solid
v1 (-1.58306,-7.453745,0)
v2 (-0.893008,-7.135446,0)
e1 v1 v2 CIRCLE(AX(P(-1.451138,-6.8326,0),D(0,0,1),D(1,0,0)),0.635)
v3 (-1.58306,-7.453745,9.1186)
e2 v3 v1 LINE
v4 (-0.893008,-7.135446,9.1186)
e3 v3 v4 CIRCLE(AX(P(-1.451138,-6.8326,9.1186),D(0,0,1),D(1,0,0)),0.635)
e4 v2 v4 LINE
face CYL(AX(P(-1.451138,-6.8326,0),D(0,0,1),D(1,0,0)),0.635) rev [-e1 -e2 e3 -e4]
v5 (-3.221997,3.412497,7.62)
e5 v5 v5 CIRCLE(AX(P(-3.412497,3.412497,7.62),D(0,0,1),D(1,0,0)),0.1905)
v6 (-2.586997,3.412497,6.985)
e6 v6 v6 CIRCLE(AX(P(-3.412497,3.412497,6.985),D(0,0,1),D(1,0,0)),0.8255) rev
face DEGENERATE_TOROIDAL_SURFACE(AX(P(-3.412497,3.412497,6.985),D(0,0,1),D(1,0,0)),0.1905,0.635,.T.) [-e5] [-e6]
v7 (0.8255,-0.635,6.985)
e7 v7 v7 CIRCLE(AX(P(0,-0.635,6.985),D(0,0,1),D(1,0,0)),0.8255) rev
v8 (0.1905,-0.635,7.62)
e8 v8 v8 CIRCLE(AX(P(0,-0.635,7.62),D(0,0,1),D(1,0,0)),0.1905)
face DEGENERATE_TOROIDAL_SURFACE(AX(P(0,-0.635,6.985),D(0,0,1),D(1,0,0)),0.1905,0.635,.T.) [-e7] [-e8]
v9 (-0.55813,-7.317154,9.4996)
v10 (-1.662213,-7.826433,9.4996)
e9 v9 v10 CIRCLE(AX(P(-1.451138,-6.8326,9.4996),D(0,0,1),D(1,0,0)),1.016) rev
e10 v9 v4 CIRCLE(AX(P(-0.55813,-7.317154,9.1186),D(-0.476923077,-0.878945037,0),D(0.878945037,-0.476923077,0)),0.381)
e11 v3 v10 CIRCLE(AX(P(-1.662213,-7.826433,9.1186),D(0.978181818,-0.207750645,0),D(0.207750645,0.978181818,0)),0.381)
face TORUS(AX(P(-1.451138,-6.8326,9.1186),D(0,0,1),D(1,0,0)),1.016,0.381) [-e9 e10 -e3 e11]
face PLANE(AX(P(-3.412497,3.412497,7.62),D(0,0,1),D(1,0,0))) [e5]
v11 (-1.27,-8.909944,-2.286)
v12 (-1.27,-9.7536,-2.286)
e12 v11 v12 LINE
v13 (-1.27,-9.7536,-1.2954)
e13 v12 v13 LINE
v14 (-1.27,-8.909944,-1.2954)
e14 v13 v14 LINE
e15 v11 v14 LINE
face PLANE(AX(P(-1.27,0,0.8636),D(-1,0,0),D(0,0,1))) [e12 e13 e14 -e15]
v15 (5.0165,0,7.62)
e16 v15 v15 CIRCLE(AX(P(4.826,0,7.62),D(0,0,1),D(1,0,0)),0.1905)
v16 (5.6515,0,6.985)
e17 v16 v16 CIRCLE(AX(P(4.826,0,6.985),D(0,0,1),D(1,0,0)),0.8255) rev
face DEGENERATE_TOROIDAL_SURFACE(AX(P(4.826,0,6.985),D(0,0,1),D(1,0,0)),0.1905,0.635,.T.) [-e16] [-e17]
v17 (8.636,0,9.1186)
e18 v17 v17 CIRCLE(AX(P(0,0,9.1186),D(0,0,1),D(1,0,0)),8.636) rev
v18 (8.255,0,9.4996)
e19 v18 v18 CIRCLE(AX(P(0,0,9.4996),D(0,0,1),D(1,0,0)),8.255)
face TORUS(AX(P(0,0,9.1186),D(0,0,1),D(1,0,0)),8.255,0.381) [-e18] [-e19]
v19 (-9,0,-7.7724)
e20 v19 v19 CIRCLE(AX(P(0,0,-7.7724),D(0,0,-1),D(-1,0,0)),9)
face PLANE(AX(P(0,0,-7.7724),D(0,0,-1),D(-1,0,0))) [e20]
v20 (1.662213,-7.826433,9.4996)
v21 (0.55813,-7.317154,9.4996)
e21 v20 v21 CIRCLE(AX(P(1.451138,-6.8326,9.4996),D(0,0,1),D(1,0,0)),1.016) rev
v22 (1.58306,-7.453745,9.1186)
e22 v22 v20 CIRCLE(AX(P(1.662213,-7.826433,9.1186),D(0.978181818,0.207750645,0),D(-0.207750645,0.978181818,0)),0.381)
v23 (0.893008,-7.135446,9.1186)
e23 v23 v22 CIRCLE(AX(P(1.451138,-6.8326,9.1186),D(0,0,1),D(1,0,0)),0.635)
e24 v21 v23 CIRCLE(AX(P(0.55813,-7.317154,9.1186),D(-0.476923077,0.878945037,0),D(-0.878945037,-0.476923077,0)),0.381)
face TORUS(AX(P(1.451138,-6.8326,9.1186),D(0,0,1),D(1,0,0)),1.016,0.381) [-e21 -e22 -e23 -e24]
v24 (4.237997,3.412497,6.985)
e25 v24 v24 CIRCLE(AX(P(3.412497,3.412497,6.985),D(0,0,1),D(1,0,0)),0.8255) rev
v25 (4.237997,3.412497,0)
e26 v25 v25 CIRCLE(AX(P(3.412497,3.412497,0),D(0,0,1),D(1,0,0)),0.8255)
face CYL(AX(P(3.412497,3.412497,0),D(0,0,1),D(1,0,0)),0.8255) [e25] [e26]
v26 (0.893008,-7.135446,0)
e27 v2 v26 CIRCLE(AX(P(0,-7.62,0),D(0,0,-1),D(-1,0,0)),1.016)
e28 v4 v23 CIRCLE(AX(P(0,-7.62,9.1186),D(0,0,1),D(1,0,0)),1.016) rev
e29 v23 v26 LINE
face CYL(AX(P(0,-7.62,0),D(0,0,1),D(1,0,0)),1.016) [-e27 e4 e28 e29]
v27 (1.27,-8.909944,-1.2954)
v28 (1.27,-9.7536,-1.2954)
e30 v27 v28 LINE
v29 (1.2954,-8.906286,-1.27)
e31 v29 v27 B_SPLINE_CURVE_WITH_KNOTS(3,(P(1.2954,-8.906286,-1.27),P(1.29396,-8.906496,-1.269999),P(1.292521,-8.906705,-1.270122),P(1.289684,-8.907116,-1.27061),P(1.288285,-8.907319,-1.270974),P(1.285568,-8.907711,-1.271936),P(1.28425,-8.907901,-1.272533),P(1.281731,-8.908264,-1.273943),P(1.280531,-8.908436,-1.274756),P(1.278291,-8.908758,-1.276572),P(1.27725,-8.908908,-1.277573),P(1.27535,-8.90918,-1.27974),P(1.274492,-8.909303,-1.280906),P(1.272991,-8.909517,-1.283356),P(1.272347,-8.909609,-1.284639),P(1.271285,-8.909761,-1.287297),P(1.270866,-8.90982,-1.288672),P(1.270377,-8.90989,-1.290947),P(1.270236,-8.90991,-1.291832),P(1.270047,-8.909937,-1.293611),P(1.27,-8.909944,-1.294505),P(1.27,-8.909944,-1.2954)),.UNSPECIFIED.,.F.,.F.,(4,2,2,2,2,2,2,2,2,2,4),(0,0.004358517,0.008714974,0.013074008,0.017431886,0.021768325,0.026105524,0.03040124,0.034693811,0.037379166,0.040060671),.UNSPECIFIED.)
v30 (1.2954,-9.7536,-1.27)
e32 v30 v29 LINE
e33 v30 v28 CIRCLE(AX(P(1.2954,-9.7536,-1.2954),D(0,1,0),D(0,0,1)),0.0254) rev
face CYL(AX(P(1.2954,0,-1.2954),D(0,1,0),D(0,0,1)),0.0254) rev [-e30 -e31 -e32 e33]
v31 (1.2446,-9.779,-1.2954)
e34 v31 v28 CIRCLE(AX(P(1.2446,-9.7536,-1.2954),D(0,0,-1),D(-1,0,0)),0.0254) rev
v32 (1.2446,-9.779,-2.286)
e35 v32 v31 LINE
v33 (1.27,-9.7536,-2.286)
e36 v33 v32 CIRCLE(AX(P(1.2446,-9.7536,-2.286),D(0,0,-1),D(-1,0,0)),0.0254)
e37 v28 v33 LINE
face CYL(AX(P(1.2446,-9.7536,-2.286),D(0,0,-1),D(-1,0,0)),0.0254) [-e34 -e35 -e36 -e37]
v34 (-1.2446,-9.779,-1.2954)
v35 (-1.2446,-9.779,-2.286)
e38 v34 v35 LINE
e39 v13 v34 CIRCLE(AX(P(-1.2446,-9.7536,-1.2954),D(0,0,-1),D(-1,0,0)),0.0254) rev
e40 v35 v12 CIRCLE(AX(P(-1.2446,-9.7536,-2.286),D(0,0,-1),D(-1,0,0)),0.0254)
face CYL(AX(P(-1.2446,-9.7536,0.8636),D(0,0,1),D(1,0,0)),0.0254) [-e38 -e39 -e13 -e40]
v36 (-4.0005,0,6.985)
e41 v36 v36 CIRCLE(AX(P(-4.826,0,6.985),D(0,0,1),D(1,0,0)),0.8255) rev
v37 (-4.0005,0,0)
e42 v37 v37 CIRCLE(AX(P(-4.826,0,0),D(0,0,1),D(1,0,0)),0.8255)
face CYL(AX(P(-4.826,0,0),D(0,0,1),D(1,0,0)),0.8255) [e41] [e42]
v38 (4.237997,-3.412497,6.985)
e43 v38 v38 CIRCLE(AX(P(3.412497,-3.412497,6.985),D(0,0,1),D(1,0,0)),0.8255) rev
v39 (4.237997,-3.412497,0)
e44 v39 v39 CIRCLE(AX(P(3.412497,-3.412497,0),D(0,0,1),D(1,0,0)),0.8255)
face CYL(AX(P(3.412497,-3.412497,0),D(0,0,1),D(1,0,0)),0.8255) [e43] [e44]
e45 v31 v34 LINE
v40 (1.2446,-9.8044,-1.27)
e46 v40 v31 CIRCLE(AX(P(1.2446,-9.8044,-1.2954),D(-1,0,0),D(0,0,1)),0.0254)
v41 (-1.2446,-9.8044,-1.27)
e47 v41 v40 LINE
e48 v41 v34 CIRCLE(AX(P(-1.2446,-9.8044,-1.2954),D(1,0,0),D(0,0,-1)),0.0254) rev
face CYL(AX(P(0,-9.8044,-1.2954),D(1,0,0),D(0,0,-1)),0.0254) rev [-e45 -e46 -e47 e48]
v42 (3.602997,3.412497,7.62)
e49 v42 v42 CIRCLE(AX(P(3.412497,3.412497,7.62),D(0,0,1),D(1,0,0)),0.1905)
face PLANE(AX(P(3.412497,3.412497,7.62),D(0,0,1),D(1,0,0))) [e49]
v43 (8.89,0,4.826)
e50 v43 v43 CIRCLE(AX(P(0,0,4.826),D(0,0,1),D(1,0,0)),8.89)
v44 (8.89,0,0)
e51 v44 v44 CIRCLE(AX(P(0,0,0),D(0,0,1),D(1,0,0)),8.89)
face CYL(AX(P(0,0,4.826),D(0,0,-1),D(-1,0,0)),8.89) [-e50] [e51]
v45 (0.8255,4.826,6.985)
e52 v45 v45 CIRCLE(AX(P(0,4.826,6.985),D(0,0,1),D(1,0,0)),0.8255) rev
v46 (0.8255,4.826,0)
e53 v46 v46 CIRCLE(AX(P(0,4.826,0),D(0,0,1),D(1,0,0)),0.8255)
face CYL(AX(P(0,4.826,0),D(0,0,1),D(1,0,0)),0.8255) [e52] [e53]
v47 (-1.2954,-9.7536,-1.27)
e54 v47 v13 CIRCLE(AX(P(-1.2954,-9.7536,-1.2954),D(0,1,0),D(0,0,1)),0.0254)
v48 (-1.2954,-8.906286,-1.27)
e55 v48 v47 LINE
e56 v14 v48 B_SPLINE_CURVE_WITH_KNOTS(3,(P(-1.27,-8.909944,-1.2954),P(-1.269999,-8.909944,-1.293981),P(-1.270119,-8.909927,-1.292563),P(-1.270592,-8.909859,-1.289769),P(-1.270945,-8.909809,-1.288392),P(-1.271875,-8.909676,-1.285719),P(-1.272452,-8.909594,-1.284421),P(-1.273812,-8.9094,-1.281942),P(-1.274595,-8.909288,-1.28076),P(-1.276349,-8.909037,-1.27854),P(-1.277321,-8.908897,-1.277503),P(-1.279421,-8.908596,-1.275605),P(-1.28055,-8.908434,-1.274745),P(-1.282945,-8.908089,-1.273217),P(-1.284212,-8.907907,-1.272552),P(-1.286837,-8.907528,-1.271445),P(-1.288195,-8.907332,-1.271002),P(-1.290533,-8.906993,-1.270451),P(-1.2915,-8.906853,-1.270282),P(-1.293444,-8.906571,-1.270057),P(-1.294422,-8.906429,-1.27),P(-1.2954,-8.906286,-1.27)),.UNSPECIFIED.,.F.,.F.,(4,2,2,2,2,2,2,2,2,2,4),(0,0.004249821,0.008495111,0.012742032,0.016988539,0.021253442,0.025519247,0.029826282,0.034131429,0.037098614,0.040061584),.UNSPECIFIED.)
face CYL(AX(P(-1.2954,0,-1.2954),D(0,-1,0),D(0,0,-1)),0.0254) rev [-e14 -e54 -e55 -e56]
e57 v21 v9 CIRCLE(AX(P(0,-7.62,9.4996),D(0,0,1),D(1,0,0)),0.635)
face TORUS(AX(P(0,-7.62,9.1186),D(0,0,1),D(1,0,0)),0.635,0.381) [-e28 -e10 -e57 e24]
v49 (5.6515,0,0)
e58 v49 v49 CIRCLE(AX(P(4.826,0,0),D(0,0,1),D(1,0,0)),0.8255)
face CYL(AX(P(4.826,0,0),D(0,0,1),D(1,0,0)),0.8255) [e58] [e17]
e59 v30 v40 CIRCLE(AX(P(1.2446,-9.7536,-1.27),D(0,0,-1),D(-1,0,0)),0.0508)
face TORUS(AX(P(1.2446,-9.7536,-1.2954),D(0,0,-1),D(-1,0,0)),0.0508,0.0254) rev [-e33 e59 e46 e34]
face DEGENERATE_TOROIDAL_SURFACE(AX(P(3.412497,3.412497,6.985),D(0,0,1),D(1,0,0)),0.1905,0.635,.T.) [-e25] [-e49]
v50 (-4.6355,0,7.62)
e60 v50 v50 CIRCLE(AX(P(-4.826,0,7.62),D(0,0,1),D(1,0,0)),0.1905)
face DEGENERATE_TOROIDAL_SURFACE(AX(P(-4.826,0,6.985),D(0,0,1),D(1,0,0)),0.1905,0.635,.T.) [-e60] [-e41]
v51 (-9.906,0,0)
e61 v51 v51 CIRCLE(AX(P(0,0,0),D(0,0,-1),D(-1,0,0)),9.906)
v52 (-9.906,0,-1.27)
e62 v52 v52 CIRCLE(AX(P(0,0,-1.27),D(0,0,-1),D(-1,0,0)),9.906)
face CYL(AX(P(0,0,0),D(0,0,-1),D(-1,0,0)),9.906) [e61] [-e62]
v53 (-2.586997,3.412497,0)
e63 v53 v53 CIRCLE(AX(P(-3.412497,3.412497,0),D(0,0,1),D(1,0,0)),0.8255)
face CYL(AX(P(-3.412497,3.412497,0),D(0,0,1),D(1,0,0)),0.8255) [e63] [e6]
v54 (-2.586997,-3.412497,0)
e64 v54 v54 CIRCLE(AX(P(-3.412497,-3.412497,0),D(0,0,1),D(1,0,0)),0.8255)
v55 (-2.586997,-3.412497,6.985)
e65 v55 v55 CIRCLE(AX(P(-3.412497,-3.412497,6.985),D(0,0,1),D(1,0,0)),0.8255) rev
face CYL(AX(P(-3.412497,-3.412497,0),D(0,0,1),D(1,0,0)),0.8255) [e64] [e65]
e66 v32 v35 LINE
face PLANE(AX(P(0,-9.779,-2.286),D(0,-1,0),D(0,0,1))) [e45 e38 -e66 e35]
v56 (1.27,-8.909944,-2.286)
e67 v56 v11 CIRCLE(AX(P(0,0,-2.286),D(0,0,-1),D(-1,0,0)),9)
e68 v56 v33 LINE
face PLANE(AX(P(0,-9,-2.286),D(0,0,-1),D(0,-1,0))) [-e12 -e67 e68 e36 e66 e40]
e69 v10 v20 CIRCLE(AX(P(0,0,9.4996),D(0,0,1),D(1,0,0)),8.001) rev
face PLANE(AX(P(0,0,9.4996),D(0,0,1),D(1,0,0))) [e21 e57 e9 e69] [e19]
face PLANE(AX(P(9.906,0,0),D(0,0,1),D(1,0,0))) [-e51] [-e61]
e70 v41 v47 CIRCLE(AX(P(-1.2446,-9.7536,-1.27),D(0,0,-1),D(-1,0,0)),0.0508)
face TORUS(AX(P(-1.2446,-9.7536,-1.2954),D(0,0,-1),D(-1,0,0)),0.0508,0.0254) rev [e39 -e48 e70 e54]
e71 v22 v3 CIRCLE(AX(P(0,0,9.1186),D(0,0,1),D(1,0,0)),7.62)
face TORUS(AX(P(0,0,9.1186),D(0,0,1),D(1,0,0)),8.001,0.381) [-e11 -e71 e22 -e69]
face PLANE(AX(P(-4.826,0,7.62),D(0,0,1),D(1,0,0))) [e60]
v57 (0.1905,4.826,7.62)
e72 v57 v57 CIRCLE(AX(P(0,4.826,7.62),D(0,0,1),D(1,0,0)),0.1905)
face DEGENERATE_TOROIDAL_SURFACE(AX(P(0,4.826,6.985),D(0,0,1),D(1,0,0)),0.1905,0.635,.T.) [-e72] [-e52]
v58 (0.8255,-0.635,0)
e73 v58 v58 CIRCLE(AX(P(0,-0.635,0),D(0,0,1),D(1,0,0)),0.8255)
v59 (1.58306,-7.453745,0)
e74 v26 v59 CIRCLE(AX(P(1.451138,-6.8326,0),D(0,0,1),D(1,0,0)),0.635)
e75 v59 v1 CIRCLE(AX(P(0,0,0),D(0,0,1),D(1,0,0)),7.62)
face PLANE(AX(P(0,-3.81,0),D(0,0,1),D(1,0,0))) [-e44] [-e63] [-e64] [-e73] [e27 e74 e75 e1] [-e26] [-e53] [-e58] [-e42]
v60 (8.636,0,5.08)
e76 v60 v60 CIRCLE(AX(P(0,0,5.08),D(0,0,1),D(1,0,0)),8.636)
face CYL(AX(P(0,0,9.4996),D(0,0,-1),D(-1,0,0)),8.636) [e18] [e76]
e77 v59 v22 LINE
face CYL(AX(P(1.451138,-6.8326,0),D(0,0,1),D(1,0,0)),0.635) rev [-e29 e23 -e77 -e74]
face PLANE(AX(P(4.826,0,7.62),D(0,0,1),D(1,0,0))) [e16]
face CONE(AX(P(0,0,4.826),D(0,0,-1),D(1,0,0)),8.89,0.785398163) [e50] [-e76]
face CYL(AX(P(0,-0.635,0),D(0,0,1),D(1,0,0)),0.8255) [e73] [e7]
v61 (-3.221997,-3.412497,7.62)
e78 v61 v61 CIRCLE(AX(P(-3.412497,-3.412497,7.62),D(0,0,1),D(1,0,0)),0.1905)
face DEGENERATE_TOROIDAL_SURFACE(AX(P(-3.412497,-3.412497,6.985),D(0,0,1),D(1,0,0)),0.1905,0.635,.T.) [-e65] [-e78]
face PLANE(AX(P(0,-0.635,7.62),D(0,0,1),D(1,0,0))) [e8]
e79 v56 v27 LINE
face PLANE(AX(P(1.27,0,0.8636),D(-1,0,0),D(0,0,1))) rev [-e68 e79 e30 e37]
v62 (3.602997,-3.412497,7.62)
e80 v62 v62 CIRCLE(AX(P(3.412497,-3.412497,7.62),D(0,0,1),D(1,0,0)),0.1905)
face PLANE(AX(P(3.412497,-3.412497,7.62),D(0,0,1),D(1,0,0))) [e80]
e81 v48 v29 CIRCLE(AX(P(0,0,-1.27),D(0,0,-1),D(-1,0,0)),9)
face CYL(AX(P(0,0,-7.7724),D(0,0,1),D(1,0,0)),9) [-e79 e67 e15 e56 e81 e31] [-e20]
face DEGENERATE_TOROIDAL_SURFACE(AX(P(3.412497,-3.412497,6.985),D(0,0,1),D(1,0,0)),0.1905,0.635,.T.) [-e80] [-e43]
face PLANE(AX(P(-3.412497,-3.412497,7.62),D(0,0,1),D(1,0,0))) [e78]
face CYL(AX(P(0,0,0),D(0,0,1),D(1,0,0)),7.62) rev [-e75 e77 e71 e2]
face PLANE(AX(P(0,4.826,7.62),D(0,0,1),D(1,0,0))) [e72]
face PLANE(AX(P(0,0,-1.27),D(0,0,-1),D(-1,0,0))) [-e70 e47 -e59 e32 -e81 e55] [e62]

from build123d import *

# Parameters (mm, degrees)
SKETCH1_W           = 9.906
SKETCH1_H           = 1.27
SKETCH2_R           = 9
BOSS_EXTRUDE1_DEPTH = 6.5024
SKETCH3_R           = 8.89
BOSS_EXTRUDE2_DEPTH = 4.826
SKETCH4_R           = 8.89
BOSS_EXTRUDE3_DEPTH = 0.254
BOSS_EXTRUDE3_TAPER = 45
SKETCH5_R           = 8.636
BOSS_EXTRUDE4_DEPTH = 4.4196
CUT_EXTRUDE1_DEPTH  = 9.4996
SKETCH7_W           = 0.8255
SKETCH7_H           = 7.62
SKETCH8_W           = 0.8255
SKETCH8_H           = 7.62
SKETCH9_W           = 0.8255
SKETCH9_H           = 7.62
SKETCH10_W          = 0.8255
SKETCH10_H          = 7.62
SKETCH11_W          = 0.8255
SKETCH11_H          = 7.62
SKETCH12_W          = 0.8255
SKETCH12_H          = 7.62
SKETCH13_W          = 0.8255
SKETCH13_H          = 7.62
SKETCH14_W          = 0.8255
SKETCH14_H          = 7.62
RIB1_START          = -1.27
RIB1_OUTLINE_W      = 2.779
RIB1_OUTLINE_H      = 1.016
RIB1_DEPTH          = 2.54
FILLET1_R           = 0.0254
FILLET2_R           = 0.635
FILLET3_R           = 0.381


# Read off the part's stored shape, not the designer's step: Rib1
with BuildPart() as part:
    # Sketch1 → Revolve1 (revolve)
    with BuildSketch(Plane.XZ, mode=Mode.PRIVATE) as revolve1_sk:
        with Locations((4.953, -0.635)):
            Rectangle(SKETCH1_W, SKETCH1_H)
    revolve(revolve1_sk.sketch.rotate(Axis((0, 0, 0), (0, 0, -1)), 180), axis=Axis((0, 0, 0), (0, 0, -1)))

    # Sketch2 → Boss-Extrude1 (add)
    with BuildSketch(Plane(origin=(0, 0, -1.27), x_dir=(-1, 0, 0), z_dir=(0, 0, -1))):
        Circle(SKETCH2_R)
    extrude(amount=BOSS_EXTRUDE1_DEPTH)

    # Sketch3 → Boss-Extrude2 (add)
    with BuildSketch(Plane.XY):
        Circle(SKETCH3_R)
    extrude(amount=BOSS_EXTRUDE2_DEPTH)

    # Sketch4 → Boss-Extrude3 (add)
    with BuildSketch(Plane.XY.offset(4.826)):
        Circle(SKETCH4_R)
    extrude(amount=BOSS_EXTRUDE3_DEPTH, taper=BOSS_EXTRUDE3_TAPER)

    # Sketch5 → Boss-Extrude4 (add)
    with BuildSketch(Plane.XY.offset(5.08)):
        Circle(SKETCH5_R)
    extrude(amount=BOSS_EXTRUDE4_DEPTH)

    # Sketch6 → Cut-Extrude1 (cut)
    with BuildSketch(Plane.XY.offset(9.4996)):
        with BuildLine():
            ThreePointArc((-1.013739708, -7.552266667), (0, -6.604), (1.013739708, -7.552266667))
            ThreePointArc((1.013739708, -7.552266667), (0, 7.62), (-1.013739708, -7.552266667))
        make_face()
    extrude(amount=-CUT_EXTRUDE1_DEPTH, mode=Mode.SUBTRACT)

    # Sketch7 → Revolve2 (revolve)
    with BuildSketch(Plane(origin=(0, 0, 0), x_dir=(1, 0, 0), z_dir=(0, 1, 0))):
        with Locations((-4.41325, -3.81)):
            Rectangle(SKETCH7_W, SKETCH7_H)
    revolve(axis=Axis((-4.826, 0, 0), (0, 0, 1)))

    # Sketch8 → Revolve3 (revolve)
    with BuildSketch(Plane(origin=(0, 3.412497326, 0), x_dir=(1, 0, 0), z_dir=(0, 1, 0))):
        with Locations((-2.999747326, -3.81)):
            Rectangle(SKETCH8_W, SKETCH8_H)
    revolve(axis=Axis((-3.412497326, 3.412497326, 0), (0, 0, 1)))

    # Sketch9 → Revolve4 (revolve)
    with BuildSketch(Plane(origin=(0, -3.412497326, 0), x_dir=(1, 0, 0), z_dir=(0, 1, 0))):
        with Locations((-2.999747326, -3.81)):
            Rectangle(SKETCH9_W, SKETCH9_H)
    revolve(axis=Axis((-3.412497326, -3.412497326, 0), (0, 0, 1)))

    # Sketch10 → Revolve5 (revolve)
    with BuildSketch(Plane(origin=(0, -3.412497326, 0), x_dir=(1, 0, 0), z_dir=(0, 1, 0))):
        with Locations((3.825247326, -3.81)):
            Rectangle(SKETCH10_W, SKETCH10_H)
    revolve(axis=Axis((3.412497326, -3.412497326, 0), (0, 0, 1)))

    # Sketch11 → Revolve6 (revolve)
    with BuildSketch(Plane(origin=(0, 0, 0), x_dir=(1, 0, 0), z_dir=(0, 1, 0))):
        with Locations((5.23875, -3.81)):
            Rectangle(SKETCH11_W, SKETCH11_H)
    revolve(axis=Axis((4.826, 0, 0), (0, 0, 1)))

    # Sketch12 → Revolve7 (revolve)
    with BuildSketch(Plane(origin=(0, 4.826, 0), x_dir=(1, 0, 0), z_dir=(0, 1, 0))):
        with Locations((0.41275, -3.81)):
            Rectangle(SKETCH12_W, SKETCH12_H)
    revolve(axis=Axis((0, 4.826, 0), (0, 0, 1)))

    # Sketch13 → Revolve8 (revolve)
    with BuildSketch(Plane(origin=(0, 3.412497326, 0), x_dir=(1, 0, 0), z_dir=(0, 1, 0))):
        with Locations((3.825247326, -3.81)):
            Rectangle(SKETCH13_W, SKETCH13_H)
    revolve(axis=Axis((3.412497326, 3.412497326, 0), (0, 0, 1)))

    # Sketch14 → Revolve9 (revolve)
    with BuildSketch(Plane(origin=(0, -0.635, 0), x_dir=(1, 0, 0), z_dir=(0, 1, 0))):
        with Locations((0.41275, -3.81)):
            Rectangle(SKETCH14_W, SKETCH14_H)
    revolve(axis=Axis((0, -0.635, 0), (0, 0, 1)))

    # Rib1 outline → Rib1 (add)
    with BuildSketch(Plane(origin=(0, 0, 0), x_dir=(0, -1, 0), z_dir=(-1, 0, 0)).offset(RIB1_START)):
        with Locations((8.3895, -1.778)):
            Rectangle(RIB1_OUTLINE_W, RIB1_OUTLINE_H)
    extrude(amount=RIB1_DEPTH)

    # Fillet1
    fillet1_edges = [part.edges().sort_by_distance(p)[0] for p in [
        (0, -9.779, -1.27),
        (1.27, -9.344471942, -1.27),
        (1.27, -9.779, -1.778),
        (-1.27, -9.779, -1.778),
        (-1.27, -9.344471942, -1.27),
    ]]
    fillet(fillet1_edges, radius=FILLET1_R)

    # Fillet2
    fillet2_edges = [part.edges().sort_by_distance(p)[0] for p in [
        (-1.013739708, -7.552266667, 4.7498),
        (1.013739708, -7.552266667, 4.7498),
        (-5.6515, 0, 7.62),
        (-4.237997326, 3.412497326, 7.62),
        (-4.237997326, -3.412497326, 7.62),
        (2.586997326, -3.412497326, 7.62),
        (4.0005, 0, 7.62),
        (-0.8255, 4.826, 7.62),
        (2.586997326, 3.412497326, 7.62),
        (-0.8255, -0.635, 7.62),
    ]]
    fillet(fillet2_edges, radius=FILLET2_R)

    # Fillet3
    fillet3_edges = [part.edges().sort_by_distance(p)[0] for p in [
        (0, 7.62, 9.4996),
        (0, -6.604, 9.4996),
        (1.185164537, -7.409213372, 9.4996),
        (-1.185164537, -7.409213372, 9.4996),
        (-8.636, 0, 9.4996),
    ]]
    fillet(fillet3_edges, radius=FILLET3_R)


solid = part.part
